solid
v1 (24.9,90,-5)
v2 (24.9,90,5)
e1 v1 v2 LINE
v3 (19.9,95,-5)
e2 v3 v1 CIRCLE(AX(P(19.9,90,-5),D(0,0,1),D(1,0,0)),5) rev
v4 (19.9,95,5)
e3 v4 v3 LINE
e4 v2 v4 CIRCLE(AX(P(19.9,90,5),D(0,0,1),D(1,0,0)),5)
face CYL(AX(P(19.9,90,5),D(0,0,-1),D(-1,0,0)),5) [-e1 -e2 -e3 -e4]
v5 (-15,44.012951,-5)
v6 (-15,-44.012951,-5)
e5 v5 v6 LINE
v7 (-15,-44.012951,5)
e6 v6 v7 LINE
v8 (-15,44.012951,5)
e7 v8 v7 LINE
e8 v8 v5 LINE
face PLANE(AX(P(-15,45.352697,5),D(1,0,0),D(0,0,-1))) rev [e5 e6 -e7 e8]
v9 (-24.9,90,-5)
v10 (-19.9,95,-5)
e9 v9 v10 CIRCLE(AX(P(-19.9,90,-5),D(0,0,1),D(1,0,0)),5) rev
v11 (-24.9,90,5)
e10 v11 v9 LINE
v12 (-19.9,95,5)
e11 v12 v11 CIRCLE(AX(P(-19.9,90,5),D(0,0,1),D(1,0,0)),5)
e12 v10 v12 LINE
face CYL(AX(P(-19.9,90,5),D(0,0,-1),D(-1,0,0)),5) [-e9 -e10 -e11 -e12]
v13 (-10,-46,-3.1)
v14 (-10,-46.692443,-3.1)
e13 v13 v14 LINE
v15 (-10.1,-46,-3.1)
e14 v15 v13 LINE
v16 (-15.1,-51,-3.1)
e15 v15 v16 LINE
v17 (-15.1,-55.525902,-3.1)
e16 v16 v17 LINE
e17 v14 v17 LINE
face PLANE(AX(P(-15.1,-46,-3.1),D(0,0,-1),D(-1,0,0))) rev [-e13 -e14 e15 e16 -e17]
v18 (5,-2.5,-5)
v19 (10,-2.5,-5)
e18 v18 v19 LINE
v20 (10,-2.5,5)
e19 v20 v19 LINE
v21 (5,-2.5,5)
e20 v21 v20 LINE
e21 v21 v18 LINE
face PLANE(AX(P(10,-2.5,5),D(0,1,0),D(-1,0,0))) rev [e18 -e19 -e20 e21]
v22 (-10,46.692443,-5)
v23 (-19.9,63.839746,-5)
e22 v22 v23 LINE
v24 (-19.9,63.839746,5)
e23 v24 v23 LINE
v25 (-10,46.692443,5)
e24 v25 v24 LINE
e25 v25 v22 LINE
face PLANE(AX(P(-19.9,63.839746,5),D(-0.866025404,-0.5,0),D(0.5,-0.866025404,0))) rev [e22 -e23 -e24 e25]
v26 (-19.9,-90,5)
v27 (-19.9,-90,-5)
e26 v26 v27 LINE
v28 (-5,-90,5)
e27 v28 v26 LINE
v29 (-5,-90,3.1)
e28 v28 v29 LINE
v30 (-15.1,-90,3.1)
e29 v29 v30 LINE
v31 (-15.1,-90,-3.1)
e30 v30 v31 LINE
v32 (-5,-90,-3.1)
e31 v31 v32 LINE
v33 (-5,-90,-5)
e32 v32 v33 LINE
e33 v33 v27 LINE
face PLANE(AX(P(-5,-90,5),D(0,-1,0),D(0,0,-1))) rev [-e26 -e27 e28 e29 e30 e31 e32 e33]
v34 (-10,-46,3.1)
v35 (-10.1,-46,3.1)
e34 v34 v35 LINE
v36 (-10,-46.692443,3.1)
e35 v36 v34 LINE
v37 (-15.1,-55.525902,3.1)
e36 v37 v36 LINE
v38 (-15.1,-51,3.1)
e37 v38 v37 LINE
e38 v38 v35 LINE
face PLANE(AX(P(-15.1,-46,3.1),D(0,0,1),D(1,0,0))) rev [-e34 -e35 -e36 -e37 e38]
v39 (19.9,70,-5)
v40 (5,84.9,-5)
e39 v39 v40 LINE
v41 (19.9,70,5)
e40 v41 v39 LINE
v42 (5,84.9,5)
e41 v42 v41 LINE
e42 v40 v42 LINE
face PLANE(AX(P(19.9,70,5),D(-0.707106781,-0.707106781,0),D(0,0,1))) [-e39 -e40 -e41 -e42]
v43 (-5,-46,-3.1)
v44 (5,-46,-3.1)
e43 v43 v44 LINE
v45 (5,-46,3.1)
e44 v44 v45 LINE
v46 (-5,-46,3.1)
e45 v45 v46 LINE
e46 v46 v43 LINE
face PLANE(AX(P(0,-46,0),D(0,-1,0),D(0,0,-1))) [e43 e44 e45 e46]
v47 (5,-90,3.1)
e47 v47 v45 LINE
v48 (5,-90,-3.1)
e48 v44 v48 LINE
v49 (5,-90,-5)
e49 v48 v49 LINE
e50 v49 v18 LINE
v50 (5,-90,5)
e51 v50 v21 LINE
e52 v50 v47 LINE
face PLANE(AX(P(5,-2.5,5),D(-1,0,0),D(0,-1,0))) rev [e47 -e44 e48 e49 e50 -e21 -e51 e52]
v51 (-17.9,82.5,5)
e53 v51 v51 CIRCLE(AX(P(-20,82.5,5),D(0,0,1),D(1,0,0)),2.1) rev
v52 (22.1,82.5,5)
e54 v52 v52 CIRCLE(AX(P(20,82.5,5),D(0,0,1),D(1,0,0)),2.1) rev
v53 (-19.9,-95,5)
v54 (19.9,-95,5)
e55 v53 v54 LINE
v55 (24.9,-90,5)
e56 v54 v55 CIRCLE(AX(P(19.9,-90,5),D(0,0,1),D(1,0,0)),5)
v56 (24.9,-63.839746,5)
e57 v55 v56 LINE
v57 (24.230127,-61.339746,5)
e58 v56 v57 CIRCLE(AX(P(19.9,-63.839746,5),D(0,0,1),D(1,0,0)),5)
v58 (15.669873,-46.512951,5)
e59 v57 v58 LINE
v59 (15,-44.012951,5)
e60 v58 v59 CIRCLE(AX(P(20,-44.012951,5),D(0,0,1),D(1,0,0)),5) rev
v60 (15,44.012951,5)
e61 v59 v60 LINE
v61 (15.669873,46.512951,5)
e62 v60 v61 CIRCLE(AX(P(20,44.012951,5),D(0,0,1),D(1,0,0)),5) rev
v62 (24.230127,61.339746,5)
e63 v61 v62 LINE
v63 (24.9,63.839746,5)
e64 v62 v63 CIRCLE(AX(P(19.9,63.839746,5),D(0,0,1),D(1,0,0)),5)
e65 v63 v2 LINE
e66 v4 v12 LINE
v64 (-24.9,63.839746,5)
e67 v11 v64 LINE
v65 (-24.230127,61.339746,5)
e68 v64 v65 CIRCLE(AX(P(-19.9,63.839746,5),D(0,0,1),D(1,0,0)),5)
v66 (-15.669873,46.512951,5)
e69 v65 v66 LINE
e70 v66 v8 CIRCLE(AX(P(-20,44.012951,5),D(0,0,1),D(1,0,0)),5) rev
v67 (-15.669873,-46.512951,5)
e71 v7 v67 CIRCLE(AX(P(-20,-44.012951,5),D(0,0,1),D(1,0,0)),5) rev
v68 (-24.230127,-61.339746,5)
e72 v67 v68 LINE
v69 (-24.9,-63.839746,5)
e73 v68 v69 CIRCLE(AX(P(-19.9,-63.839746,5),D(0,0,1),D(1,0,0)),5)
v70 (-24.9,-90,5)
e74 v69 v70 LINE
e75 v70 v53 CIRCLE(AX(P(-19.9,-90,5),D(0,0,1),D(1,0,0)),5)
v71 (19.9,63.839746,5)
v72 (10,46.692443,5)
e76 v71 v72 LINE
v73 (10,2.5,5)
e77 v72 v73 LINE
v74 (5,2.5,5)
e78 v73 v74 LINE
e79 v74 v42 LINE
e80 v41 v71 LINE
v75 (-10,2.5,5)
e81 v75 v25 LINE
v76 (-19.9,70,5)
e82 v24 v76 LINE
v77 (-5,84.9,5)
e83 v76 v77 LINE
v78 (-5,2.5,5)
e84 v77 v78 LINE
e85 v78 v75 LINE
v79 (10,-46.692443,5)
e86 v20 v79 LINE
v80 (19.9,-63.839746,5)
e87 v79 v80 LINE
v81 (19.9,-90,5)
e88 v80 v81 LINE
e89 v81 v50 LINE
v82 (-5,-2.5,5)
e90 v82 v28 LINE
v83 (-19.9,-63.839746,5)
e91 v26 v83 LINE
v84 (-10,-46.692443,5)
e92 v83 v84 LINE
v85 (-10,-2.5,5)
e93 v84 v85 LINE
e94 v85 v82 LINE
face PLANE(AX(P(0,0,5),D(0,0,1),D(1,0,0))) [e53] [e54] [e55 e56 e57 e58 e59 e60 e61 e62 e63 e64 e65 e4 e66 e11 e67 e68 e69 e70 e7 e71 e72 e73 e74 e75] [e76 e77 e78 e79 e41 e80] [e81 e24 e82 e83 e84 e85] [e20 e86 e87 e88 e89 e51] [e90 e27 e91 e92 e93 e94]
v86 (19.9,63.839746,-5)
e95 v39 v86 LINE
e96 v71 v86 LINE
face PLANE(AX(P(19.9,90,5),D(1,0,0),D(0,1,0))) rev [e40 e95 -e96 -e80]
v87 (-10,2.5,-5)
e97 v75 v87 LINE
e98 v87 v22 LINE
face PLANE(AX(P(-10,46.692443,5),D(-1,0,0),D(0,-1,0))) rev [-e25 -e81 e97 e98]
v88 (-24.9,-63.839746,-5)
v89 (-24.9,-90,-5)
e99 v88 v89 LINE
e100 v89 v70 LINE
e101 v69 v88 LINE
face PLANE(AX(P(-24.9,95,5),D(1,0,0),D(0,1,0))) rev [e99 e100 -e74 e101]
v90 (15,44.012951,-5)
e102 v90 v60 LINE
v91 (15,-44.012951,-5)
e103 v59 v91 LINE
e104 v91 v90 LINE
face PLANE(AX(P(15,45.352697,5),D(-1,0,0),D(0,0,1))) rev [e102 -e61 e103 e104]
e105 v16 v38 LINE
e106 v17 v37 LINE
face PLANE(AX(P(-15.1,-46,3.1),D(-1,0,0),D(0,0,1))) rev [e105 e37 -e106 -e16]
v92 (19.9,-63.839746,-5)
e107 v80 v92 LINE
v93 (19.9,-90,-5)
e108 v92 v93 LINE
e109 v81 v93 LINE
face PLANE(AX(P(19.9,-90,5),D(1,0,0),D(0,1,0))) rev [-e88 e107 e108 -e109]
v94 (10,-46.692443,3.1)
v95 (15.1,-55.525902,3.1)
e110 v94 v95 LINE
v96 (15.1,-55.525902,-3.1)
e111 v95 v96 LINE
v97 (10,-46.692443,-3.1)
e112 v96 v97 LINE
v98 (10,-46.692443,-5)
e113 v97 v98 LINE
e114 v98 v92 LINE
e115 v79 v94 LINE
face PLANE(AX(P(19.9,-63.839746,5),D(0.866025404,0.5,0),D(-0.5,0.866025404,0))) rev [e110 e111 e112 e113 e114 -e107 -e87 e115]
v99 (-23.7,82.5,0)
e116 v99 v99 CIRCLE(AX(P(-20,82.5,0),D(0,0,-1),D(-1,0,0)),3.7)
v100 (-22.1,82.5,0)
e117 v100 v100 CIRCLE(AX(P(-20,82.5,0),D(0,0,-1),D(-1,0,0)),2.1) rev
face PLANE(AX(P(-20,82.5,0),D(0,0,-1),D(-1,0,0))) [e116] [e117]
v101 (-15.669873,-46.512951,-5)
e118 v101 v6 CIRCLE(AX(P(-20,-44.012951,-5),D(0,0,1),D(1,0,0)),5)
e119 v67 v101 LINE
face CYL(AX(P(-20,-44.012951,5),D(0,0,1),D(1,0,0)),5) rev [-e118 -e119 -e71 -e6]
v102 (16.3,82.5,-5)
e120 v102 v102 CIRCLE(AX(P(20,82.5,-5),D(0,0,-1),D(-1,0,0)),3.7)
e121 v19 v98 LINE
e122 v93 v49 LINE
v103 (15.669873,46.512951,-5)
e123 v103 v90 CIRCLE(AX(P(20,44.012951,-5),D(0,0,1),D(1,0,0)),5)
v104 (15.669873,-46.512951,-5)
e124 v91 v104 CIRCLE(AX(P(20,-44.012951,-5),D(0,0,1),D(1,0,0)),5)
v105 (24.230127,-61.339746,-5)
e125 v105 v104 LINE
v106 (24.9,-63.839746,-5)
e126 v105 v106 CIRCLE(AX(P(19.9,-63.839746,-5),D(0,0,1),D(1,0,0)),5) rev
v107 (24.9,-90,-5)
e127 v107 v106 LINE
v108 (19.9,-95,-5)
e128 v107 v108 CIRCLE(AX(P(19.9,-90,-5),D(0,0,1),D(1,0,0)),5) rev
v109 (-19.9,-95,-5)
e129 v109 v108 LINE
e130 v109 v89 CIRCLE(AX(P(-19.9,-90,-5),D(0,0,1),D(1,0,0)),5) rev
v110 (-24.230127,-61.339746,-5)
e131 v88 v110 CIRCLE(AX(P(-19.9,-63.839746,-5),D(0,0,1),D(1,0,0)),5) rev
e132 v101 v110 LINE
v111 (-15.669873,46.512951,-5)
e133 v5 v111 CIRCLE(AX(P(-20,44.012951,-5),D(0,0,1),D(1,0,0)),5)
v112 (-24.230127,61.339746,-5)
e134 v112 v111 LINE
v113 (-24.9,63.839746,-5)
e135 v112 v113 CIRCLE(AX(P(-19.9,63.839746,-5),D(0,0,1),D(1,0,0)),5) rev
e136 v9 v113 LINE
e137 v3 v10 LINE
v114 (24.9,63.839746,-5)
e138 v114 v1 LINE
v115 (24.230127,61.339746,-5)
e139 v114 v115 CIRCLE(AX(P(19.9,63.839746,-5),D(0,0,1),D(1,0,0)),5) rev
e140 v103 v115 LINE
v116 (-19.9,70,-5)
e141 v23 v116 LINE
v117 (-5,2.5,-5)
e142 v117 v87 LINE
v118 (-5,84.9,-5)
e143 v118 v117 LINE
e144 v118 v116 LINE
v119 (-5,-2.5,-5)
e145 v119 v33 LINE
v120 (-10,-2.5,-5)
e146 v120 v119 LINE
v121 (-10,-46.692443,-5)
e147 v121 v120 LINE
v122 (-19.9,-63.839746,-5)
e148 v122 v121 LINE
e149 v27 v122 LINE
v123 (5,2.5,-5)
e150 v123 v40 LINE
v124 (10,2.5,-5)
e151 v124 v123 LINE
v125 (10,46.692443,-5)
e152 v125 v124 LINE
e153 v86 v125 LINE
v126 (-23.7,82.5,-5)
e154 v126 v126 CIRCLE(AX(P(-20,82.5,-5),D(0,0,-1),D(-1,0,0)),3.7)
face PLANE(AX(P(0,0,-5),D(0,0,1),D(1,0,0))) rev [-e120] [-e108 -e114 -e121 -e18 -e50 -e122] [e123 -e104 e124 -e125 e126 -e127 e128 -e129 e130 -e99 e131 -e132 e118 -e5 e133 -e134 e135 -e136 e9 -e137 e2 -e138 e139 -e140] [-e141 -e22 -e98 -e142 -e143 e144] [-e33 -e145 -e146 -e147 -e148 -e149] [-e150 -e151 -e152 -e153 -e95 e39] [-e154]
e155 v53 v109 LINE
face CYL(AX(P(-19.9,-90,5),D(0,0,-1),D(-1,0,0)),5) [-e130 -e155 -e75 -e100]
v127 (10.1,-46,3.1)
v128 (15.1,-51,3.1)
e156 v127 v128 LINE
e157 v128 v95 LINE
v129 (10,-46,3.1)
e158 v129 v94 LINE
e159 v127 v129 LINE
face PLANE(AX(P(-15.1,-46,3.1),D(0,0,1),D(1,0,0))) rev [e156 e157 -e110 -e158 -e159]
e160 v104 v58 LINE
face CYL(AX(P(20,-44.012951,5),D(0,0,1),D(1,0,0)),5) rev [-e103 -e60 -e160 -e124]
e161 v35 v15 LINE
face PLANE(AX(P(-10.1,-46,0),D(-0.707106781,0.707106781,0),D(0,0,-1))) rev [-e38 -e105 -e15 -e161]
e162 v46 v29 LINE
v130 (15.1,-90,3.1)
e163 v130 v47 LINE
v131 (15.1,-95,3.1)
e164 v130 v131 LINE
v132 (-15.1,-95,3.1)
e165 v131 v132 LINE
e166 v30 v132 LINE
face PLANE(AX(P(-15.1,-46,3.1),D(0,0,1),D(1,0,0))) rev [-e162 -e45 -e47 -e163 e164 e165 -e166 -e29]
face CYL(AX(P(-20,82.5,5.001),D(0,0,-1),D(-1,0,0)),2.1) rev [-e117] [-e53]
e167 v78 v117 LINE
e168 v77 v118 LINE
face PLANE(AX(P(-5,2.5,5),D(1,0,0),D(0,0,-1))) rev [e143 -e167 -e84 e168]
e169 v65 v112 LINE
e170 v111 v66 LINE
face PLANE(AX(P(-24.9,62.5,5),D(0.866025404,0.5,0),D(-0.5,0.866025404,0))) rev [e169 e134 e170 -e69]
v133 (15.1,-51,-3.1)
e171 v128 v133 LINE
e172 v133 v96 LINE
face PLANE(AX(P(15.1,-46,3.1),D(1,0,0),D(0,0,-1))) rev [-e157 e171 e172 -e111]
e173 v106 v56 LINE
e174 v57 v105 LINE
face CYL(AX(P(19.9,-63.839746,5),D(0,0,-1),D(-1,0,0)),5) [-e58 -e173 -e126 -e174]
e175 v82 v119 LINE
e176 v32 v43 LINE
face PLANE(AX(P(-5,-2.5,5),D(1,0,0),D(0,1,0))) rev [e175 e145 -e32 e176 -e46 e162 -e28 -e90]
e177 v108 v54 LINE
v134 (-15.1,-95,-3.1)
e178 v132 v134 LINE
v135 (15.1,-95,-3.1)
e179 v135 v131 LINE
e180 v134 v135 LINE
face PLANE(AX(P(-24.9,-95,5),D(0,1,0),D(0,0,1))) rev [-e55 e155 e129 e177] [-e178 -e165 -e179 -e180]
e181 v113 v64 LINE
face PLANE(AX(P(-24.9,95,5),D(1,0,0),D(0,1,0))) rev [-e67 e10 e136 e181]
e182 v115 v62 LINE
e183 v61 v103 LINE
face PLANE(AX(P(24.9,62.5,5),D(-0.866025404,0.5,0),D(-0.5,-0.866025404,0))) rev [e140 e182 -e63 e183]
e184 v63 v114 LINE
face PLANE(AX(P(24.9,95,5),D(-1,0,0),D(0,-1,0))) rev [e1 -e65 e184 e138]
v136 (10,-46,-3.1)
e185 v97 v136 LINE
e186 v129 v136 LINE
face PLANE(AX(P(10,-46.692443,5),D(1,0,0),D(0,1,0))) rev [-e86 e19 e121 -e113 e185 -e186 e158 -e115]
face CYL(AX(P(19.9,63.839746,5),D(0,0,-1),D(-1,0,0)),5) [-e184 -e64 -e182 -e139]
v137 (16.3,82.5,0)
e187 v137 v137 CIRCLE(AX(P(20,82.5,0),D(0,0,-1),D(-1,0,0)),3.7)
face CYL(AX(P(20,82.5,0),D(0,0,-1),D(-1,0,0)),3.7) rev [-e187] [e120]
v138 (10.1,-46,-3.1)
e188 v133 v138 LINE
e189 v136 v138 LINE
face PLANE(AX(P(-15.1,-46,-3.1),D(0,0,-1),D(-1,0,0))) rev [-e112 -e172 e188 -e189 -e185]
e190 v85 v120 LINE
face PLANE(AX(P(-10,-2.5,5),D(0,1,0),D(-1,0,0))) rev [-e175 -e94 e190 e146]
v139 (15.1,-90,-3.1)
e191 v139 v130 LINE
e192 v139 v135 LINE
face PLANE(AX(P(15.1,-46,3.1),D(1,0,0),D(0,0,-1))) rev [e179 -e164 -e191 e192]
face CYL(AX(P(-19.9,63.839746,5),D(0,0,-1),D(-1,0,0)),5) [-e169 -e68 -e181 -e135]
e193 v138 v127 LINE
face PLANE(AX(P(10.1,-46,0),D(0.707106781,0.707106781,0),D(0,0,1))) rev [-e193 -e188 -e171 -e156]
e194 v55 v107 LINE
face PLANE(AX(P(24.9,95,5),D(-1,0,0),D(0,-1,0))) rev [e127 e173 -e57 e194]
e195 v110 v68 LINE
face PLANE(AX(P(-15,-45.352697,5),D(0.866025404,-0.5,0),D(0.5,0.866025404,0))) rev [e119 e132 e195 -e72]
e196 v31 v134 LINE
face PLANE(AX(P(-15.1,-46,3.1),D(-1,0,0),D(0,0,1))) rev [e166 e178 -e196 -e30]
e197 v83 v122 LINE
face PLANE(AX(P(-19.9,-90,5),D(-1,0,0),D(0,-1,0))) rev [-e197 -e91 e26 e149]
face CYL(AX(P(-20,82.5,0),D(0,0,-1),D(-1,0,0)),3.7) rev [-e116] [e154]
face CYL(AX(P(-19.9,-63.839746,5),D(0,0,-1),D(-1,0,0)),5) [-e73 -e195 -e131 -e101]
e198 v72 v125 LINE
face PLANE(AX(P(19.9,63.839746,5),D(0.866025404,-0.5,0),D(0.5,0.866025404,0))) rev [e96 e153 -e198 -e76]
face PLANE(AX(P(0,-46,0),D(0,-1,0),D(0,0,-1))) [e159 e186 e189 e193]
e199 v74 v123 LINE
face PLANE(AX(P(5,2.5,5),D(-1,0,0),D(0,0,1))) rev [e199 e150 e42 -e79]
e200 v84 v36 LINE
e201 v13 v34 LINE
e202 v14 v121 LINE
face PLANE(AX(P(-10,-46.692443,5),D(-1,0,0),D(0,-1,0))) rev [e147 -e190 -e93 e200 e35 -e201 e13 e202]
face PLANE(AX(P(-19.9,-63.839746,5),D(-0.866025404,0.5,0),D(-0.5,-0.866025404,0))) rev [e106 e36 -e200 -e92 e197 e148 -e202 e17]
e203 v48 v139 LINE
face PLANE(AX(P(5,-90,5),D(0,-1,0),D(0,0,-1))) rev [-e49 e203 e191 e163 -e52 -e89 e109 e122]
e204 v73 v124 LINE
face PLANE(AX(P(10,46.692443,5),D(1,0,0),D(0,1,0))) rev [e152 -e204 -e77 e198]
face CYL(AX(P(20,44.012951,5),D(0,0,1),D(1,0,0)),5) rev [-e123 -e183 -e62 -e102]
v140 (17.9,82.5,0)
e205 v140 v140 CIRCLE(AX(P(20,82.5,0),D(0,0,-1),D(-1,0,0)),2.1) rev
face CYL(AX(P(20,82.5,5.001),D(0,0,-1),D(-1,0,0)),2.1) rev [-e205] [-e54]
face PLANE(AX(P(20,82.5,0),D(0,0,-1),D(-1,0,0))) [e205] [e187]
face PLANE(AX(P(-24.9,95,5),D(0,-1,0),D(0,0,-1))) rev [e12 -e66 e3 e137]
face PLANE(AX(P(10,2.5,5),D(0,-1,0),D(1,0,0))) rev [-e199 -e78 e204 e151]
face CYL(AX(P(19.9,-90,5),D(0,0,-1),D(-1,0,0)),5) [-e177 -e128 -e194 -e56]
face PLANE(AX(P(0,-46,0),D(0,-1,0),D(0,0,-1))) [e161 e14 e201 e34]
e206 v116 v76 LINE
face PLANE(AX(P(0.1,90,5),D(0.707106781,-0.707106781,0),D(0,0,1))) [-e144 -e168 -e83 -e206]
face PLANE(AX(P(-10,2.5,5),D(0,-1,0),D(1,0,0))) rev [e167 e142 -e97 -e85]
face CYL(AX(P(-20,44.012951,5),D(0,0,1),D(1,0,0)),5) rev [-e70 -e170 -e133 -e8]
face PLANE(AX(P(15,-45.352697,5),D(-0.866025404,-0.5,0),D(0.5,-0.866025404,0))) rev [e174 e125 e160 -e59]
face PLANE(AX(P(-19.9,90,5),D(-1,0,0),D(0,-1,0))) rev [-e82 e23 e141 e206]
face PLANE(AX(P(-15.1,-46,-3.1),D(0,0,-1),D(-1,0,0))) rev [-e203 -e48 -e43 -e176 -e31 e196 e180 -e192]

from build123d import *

# Parameters (mm, degrees)
SKETCH_1_W          = 49.8
SKETCH_1_H          = 190
EXTRUDE_1_DEPTH     = 5
CUT_EXTRUDE_1_DEPTH = 99.71681721
FILLET_1_R          = 5
CUT_EXTRUDE_2_DEPTH = 99.71681721
CHAMFER_2_SIZE      = 20
CUT_EXTRUDE_6_REACH = 100.717
SKETCH_7_R          = 2.1
SKETCH_3_W          = 30.2
SKETCH_3_H          = 6.2
CUT_EXTRUDE_7_DEPTH = 49
CHAMFER_3_SIZE      = 5
SKETCH_9_R          = 3.7
CUT_EXTRUDE_8_DEPTH = 5


with BuildPart() as part:
    # 草图1 → 凸台-拉伸1 (new, symmetric)
    with BuildSketch(Plane.XY):
        Rectangle(SKETCH_1_W, SKETCH_1_H)
    extrude(amount=EXTRUDE_1_DEPTH, both=True)

    # 草图4 → 切除-拉伸1 (cut, through all)
    with BuildSketch(Plane(origin=(0, 0, -5), x_dir=(-1, 0, 0), z_dir=(0, 0, -1))):
        Polygon((-24.9, 62.5), (-15, 45.352697005), (-15, -45.352697005), (-24.9, -62.5), align=None)
        Polygon((24.9, -62.5), (24.9, 62.5), (15, 45.352697005), (15, -45.352697005), align=None)
    extrude(amount=-CUT_EXTRUDE_1_DEPTH, mode=Mode.SUBTRACT)

    # 圆角1
    fillet_1_edges = [part.edges().sort_by_distance(p)[0] for p in [
        (24.9, -62.5, 0),
        (24.9, 62.5, 0),
        (15, 45.352697005, 0),
        (15, -45.352697005, 0),
        (-24.9, -62.5, 0),
        (-15, -45.352697005, 0),
        (-15, 45.352697005, 0),
        (-24.9, 62.5, 0),
        (24.9, -95, 0),
        (-24.9, -95, 0),
        (-24.9, 95, 0),
        (24.9, 95, 0),
    ]]
    fillet(fillet_1_edges, radius=FILLET_1_R)

    # 草图5 → 切除-拉伸2 (cut, through all)
    with BuildSketch(Plane(origin=(0, 0, -5), x_dir=(-1, 0, 0), z_dir=(0, 0, -1))):
        Polygon((-19.9, 90), (-19.9, 63.839745962), (-10, 46.692442967), (-10, 2.5), (-5, 2.5), (-5, 90), align=None)
        Polygon((5, 90), (19.9, 90), (19.9, 63.839745962), (10, 46.692442967), (10, 2.5), (5, 2.5), align=None)
        Polygon((19.9, -90), (19.9, -63.839745962), (10, -46.692442967), (10, -2.5), (5, -2.5), (5, -90), align=None)
        Polygon((-5, -90), (-19.9, -90), (-19.9, -63.839745962), (-10, -46.692442967), (-10, -2.5), (-5, -2.5), align=None)
    extrude(amount=-CUT_EXTRUDE_2_DEPTH, mode=Mode.SUBTRACT)

    # 倒角2
    # the kernel refuses this chamfer: 20 mm, written as the material it adds along each edge
    with BuildSketch(Plane(origin=(-19.9, 90, -5), x_dir=(-0.027495876610586147, -0.9996219169112968, 0), z_dir=(0, 0, 1))) as chamfer_2_piece_1:
        Polygon((CHAMFER_2_SIZE * 0.999621916911, CHAMFER_2_SIZE * 0.0274958766106), (-CHAMFER_2_SIZE * 0.0274958766106, CHAMFER_2_SIZE * 0.999621916911), (0, 0), align=None)
    extrude(amount=10)
    with BuildSketch(Plane(origin=(19.9, 90, -5), x_dir=(0.027495876610586147, -0.9996219169112968, 0), z_dir=(0, 0, 1))) as chamfer_2_piece_2:
        Polygon((CHAMFER_2_SIZE * 0.999621916911, -CHAMFER_2_SIZE * 0.0274958766106), (-CHAMFER_2_SIZE * 0.0274958766106, -CHAMFER_2_SIZE * 0.999621916911), (0, 0), align=None)
    extrude(amount=10)

    # 草图7 → 切除-拉伸6 (cut, up to next)
    with BuildSketch(Plane(origin=(0, 0, -5), x_dir=(-1, 0, 0), z_dir=(0, 0, -1)), mode=Mode.PRIVATE) as cut_extrude_6_sk1:
        with Locations((-20, 82.5)):
            Circle(SKETCH_7_R)
    cut_extrude_6_tool1 = extrude(cut_extrude_6_sk1.sketch, amount=-CUT_EXTRUDE_6_REACH, mode=Mode.PRIVATE) & part.part
    # 草图7 → 切除-拉伸6 (cut, up to next)
    with BuildSketch(Plane(origin=(0, 0, -5), x_dir=(-1, 0, 0), z_dir=(0, 0, -1)), mode=Mode.PRIVATE) as cut_extrude_6_sk2:
        with Locations(Location((20, 82.5, 0), (0, 0, 180))):
            Circle(SKETCH_7_R)
    cut_extrude_6_tool2 = extrude(cut_extrude_6_sk2.sketch, amount=-CUT_EXTRUDE_6_REACH, mode=Mode.PRIVATE) & part.part
    add(cut_extrude_6_tool1.solids().sort_by_distance((20, 82.5, -5))[0], mode=Mode.SUBTRACT)
    add(cut_extrude_6_tool2.solids().sort_by_distance((-20, 82.5, -5))[0], mode=Mode.SUBTRACT)

    # 草图3 → 切除-拉伸7 (cut)
    with BuildSketch(Plane.XZ.offset(95)):
        Rectangle(SKETCH_3_W, SKETCH_3_H)
    extrude(amount=-CUT_EXTRUDE_7_DEPTH, mode=Mode.SUBTRACT)

    # 倒角3
    chamfer_3_edges = [part.edges().sort_by_distance(p)[0] for p in [
        (-15.1, -46, 0),
        (15.1, -46, 0),
    ]]
    chamfer(chamfer_3_edges, length=CHAMFER_3_SIZE)

    # 草图9 → 切除-拉伸8 (cut)
    with BuildSketch(Plane(origin=(0, 0, -5), x_dir=(-1, 0, 0), z_dir=(0, 0, -1))):
        with Locations((-20, 82.5)):
            Circle(SKETCH_9_R)
        with Locations((20, 82.5)):
            Circle(SKETCH_9_R)
    extrude(amount=-CUT_EXTRUDE_8_DEPTH, mode=Mode.SUBTRACT)


solid = part.part
